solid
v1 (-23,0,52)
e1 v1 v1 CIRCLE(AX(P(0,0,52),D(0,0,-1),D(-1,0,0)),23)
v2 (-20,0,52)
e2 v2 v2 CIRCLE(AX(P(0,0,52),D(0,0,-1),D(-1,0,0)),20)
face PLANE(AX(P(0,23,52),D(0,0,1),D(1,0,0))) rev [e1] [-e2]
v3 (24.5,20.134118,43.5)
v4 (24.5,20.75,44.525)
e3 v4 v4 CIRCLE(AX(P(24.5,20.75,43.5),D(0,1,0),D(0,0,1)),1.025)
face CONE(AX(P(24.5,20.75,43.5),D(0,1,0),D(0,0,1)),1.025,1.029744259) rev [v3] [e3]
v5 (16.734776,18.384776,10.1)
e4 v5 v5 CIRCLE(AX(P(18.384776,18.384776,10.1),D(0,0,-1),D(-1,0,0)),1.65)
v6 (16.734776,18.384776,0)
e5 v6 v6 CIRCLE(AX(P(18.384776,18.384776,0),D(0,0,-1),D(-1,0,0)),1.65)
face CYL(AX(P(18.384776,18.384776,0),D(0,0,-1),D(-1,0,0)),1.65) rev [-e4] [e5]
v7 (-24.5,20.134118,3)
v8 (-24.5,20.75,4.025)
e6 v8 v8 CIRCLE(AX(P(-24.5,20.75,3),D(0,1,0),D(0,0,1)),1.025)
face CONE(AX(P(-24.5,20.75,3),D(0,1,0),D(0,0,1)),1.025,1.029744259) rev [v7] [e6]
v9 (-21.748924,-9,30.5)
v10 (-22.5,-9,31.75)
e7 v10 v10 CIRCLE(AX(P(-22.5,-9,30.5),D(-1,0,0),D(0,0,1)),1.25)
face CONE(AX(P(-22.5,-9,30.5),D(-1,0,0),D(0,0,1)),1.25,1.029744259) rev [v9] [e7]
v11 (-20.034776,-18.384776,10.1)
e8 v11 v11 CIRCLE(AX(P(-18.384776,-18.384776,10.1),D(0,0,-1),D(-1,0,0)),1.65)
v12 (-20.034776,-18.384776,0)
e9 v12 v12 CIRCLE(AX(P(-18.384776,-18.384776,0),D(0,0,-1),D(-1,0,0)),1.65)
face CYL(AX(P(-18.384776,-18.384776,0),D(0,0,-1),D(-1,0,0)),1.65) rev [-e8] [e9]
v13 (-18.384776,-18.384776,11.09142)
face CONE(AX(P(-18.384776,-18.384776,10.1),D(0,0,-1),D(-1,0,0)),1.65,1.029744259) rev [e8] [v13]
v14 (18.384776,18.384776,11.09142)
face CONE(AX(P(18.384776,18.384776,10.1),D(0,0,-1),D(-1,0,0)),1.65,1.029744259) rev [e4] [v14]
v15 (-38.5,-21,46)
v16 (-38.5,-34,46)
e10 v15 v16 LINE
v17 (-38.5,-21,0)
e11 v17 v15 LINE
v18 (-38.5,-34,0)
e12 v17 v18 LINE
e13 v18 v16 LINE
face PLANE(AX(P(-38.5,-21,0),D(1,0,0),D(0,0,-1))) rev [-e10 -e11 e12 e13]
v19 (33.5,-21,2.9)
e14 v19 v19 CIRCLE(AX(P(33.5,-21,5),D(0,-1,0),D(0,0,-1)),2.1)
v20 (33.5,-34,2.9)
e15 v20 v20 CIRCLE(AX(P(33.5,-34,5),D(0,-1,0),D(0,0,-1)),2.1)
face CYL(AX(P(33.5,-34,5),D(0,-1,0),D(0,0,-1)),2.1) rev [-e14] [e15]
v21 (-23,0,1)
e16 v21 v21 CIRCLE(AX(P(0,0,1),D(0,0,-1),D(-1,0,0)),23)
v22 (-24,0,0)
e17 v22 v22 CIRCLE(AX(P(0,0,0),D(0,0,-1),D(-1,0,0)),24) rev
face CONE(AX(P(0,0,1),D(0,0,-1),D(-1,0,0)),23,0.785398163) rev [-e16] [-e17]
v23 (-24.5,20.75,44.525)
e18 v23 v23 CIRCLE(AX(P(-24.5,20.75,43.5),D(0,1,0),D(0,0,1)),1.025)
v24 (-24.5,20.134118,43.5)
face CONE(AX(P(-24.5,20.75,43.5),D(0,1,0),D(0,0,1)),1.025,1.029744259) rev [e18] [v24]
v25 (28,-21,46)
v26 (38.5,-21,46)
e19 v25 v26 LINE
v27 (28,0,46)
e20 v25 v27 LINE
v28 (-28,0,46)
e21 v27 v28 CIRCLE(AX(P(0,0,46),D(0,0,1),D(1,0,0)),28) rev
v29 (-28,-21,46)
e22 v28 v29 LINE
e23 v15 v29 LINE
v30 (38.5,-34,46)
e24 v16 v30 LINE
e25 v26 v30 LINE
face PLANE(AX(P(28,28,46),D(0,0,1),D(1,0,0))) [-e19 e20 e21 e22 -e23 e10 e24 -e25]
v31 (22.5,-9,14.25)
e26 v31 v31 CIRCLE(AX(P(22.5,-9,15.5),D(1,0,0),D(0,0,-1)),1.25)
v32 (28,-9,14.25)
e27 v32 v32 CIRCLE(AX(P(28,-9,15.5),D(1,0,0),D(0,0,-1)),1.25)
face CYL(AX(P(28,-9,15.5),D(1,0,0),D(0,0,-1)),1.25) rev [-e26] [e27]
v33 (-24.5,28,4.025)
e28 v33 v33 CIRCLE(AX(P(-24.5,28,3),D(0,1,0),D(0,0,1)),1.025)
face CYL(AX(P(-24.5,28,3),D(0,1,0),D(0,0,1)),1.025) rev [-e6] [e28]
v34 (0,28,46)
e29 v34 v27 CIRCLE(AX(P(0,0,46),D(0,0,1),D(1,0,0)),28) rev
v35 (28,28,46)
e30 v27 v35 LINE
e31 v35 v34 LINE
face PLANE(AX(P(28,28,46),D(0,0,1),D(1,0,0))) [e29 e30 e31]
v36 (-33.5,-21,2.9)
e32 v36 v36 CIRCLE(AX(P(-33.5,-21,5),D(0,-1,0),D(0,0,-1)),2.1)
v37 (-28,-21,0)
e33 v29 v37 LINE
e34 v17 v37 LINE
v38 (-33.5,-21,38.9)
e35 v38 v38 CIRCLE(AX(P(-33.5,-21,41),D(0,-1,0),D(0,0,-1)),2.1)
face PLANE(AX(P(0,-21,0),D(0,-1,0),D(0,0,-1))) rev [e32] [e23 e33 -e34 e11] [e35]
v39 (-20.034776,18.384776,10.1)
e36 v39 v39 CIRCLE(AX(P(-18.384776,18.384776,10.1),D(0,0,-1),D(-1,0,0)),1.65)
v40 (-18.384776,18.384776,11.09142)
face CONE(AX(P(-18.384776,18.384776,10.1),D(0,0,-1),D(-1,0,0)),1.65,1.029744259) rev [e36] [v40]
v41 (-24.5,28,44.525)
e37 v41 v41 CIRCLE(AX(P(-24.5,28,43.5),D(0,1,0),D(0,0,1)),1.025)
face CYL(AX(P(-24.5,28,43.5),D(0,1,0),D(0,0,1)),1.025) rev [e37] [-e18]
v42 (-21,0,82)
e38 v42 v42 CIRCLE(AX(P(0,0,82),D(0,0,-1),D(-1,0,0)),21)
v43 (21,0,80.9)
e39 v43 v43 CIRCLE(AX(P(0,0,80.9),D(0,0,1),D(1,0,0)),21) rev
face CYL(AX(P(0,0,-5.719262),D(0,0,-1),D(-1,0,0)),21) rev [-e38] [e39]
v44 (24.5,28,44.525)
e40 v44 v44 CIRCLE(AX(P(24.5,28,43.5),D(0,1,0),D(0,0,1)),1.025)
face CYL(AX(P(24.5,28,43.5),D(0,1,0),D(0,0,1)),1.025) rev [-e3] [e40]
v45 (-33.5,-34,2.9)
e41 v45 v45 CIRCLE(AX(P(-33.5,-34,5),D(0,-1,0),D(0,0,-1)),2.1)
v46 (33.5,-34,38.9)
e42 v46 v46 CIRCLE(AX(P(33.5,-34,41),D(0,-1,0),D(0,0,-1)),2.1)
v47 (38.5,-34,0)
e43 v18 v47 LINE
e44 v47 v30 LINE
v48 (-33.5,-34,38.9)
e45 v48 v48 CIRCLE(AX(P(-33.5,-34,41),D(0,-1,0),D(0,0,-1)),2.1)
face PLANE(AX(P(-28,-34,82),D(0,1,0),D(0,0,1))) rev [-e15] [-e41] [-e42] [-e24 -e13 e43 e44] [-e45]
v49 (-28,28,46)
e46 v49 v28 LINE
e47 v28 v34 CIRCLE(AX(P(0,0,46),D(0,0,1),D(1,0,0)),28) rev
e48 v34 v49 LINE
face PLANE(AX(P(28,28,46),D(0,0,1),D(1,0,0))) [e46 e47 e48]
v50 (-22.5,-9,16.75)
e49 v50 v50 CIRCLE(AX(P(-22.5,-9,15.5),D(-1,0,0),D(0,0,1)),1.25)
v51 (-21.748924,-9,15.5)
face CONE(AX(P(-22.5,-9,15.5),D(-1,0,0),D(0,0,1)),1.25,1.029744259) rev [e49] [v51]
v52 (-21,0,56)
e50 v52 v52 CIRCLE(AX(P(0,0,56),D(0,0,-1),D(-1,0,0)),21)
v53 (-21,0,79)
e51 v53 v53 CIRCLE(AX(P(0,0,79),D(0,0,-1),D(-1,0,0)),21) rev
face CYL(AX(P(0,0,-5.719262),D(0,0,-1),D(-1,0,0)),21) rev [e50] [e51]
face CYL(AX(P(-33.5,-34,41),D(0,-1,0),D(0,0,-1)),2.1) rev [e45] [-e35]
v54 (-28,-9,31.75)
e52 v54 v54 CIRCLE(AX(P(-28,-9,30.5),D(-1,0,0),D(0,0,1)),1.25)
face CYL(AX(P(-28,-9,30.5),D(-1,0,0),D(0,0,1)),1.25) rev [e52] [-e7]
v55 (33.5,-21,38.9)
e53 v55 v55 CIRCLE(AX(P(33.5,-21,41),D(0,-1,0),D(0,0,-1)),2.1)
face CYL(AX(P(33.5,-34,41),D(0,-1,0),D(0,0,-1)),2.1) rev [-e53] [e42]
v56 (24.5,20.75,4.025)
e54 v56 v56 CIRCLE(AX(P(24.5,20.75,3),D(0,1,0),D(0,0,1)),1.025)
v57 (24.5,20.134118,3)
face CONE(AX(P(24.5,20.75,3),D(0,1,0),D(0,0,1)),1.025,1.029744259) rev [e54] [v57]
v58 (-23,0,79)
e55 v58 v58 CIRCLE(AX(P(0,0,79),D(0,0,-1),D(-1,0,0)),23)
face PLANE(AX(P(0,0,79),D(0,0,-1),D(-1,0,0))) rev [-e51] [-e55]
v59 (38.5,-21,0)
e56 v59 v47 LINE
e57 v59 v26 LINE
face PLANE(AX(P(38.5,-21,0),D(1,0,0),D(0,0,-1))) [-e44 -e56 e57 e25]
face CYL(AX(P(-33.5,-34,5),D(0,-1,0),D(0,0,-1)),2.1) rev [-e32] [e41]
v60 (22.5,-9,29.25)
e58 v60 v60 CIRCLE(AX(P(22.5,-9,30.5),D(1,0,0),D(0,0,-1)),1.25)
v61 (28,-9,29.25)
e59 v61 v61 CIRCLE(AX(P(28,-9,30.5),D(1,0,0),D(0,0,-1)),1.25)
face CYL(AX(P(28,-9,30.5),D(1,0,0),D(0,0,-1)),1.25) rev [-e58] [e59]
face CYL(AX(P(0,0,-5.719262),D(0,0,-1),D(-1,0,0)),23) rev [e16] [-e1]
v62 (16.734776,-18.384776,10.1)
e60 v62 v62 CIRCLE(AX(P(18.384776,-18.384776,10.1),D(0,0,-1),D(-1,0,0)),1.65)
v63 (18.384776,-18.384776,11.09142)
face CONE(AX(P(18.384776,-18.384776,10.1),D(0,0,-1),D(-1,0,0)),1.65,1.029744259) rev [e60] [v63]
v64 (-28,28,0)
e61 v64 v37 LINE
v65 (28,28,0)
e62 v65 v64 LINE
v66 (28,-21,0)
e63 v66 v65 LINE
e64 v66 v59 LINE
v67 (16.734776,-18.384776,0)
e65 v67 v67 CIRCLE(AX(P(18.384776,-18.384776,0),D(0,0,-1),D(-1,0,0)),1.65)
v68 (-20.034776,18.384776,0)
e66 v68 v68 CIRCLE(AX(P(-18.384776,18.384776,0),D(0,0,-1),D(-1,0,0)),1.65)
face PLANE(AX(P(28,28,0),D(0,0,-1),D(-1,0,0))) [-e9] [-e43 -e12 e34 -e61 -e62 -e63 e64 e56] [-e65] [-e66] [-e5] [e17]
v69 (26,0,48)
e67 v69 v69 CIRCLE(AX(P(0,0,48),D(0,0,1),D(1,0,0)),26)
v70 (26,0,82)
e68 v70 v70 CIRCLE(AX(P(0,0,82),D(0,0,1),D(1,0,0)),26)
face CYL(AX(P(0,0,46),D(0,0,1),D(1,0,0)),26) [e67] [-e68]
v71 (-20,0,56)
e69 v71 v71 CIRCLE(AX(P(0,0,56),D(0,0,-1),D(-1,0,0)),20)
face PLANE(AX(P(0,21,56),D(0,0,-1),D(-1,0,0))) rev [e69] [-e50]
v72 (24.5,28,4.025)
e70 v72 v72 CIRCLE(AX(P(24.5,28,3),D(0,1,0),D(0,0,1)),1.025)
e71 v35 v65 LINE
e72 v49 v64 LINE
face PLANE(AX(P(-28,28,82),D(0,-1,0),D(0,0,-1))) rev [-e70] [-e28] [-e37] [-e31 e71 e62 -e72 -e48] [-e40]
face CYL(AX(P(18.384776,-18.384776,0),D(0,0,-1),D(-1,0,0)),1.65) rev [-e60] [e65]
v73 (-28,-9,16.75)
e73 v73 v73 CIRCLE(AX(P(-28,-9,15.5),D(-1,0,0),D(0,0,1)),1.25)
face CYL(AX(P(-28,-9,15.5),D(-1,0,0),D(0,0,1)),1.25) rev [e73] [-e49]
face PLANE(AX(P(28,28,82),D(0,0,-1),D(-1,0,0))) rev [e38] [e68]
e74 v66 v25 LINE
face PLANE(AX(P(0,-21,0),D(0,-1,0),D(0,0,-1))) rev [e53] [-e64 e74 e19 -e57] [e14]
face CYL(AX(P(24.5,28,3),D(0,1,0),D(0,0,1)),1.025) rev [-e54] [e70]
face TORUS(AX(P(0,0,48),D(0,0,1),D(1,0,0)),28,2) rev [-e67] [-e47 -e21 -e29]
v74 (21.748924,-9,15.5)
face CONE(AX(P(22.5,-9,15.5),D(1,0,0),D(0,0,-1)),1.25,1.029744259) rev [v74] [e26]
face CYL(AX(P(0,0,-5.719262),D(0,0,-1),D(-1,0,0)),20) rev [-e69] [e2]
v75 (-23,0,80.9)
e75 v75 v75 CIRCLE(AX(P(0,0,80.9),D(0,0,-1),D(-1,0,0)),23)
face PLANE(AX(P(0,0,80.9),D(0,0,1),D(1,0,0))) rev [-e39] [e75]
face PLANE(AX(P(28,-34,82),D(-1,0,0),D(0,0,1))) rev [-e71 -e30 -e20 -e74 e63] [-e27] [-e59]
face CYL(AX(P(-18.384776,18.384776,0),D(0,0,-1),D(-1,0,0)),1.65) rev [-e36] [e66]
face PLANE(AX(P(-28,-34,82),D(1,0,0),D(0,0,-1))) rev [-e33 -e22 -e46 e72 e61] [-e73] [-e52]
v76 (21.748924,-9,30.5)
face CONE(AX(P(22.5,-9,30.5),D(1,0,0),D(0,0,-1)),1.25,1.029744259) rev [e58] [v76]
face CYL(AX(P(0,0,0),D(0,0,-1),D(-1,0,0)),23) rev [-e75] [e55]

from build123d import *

# Parameters (mm, degrees)
SKETCH_1_W                  = 56
SKETCH_1_H                  = 62
EXTRUDE_1_DEPTH             = 82
SKETCH_4_W                  = 56
SKETCH_4_H                  = 62
SKETCH_4_R                  = 26
CUT_EXTRUDE_1_DEPTH         = 36
HOLE_WIZARD_M4_1_D          = 3.3
HOLE_WIZARD_M4_1_DEPTH      = 10.1
HOLE_WIZARD_M4_1_TIP        = 0.991420021
SKETCH_15_W                 = 23
SKETCH_15_H                 = 1.9
FILLET_1_R                  = 2
CHAMFER_2_SIZE              = 1
HOLE_WIZARD_M2_5_1_D        = 2.05
HOLE_WIZARD_M2_5_1_DEPTH    = 7.25
HOLE_WIZARD_M2_5_1_TIP      = 0.615882135
SKETCH_19_W                 = 10.5
SKETCH_19_H                 = 46
EXTRUDE_2_DEPTH             = 13
HOLE_WIZARD_M5_1_D          = 4.2
HOLE_WIZARD_M3_1_AT_2_COUNT = 2
HOLE_WIZARD_M3_1_AT_2_PITCH = 15


with BuildPart() as part:
    # 草图1 → 凸台-拉伸1 (new body)
    with BuildSketch(Plane.XY):
        with Locations((0, -3)):
            Rectangle(SKETCH_1_W, SKETCH_1_H)
    extrude(amount=EXTRUDE_1_DEPTH)

    # 草图3 → 切除-旋转2 (revolve, cut)
    with BuildSketch(Plane(origin=(0, 0, 0), x_dir=(0, 0, -1), z_dir=(1, 0, 0)), mode=Mode.PRIVATE) as cut_revolve_2_sk:
        Polygon((-82, 0), (0, 0), (0, 23), (-52, 23), (-52, 20), (-56, 20), (-56, 21), (-82, 21), align=None)
    revolve(cut_revolve_2_sk.sketch.rotate(Axis((0, 0, -5.719261836), (0, 0, 1)), 90), axis=Axis((0, 0, -5.719261836), (0, 0, 1)), mode=Mode.SUBTRACT)

    # 草图4 → 切除-拉伸1 (cut)
    with BuildSketch(Plane.XY.offset(82)):
        with Locations((0, -3)):
            Rectangle(SKETCH_4_W, SKETCH_4_H)
        Circle(SKETCH_4_R, mode=Mode.SUBTRACT)
    extrude(amount=-CUT_EXTRUDE_1_DEPTH, mode=Mode.SUBTRACT)

    # M4 螺纹孔1
    with Locations(Plane(origin=(0, 0, 0), x_dir=(-1, 0, 0), z_dir=(0, 0, -1))):
        with Locations((18.384776311, 18.384776311), (18.384776311, -18.384776311), (-18.384776311, -18.384776311), (-18.384776311, 18.384776311)):
            Hole(HOLE_WIZARD_M4_1_D / 2, depth=HOLE_WIZARD_M4_1_DEPTH)
            with Locations((0, 0, -(HOLE_WIZARD_M4_1_DEPTH + HOLE_WIZARD_M4_1_TIP / 2))):  # 118° drill point
                Cone(0, HOLE_WIZARD_M4_1_D / 2, HOLE_WIZARD_M4_1_TIP, mode=Mode.SUBTRACT)

    # 草图15 → 切除-旋转3 (revolve, cut)
    with BuildSketch(Plane(origin=(0, 0, 0), x_dir=(1, 0, 0), z_dir=(0, 1, 0))):
        with Locations((-11.5, -79.95)):
            Rectangle(SKETCH_15_W, SKETCH_15_H)
    revolve(axis=Axis((0, 0, 0), (0, 0, 1)), mode=Mode.SUBTRACT)

    # 圆角1
    fillet_1_edges = [part.edges().sort_by_distance(p)[0] for p in [
        (-26, 0, 46),
    ]]
    fillet(fillet_1_edges, radius=FILLET_1_R - 0.0001)  # a hair under: the kernel refuses the full size

    # 倒角2
    chamfer_2_edges = [part.edges().sort_by_distance(p)[0] for p in [
        (23, 0, 0),
    ]]
    chamfer(chamfer_2_edges, length=CHAMFER_2_SIZE)

    # M2.5 螺纹孔1
    with Locations(Plane(origin=(0, 28, 0), x_dir=(1, 0, 0), z_dir=(0, 1, 0))):
        with Locations((24.5, -3), (-24.5, -43.5), (-24.5, -3), (24.5, -43.5)):
            Hole(HOLE_WIZARD_M2_5_1_D / 2, depth=HOLE_WIZARD_M2_5_1_DEPTH)
            with Locations((0, 0, -(HOLE_WIZARD_M2_5_1_DEPTH + HOLE_WIZARD_M2_5_1_TIP / 2))):  # 118° drill point
                Cone(0, HOLE_WIZARD_M2_5_1_D / 2, HOLE_WIZARD_M2_5_1_TIP, mode=Mode.SUBTRACT)

    # 草图19 → 凸台-拉伸2 (add)
    with BuildSketch(Plane.XZ.offset(34)):
        with Locations((33.25, 23)):
            Rectangle(SKETCH_19_W, SKETCH_19_H)
        with Locations((-33.25, 23)):
            Rectangle(SKETCH_19_W, SKETCH_19_H)
    extrude(amount=-EXTRUDE_2_DEPTH)

    # M5 螺纹孔1 (through all)
    with Locations(Plane(origin=(0, -34, 0), x_dir=(-1, 0, 0), z_dir=(0, -1, 0))):
        with Locations((33.5, -5), (-33.5, -41), (-33.5, -5), (33.5, -41)):
            Hole(HOLE_WIZARD_M5_1_D / 2)

    # 草图24 → M3 螺纹孔1 (revolve, cut)
    with BuildSketch(Plane(origin=(28, -9, 30.5), x_dir=(0, 0, -1), z_dir=(0, 1, 0))):
        Polygon((0, 0), (0, 6.251075774), (1.25, 5.5), (1.25, 0), align=None)
    hole_wizard_m3_1 = revolve(axis=Axis((34.35, -9, 30.5), (-1, 0, 0)), mode=Mode.SUBTRACT)

    # M3 螺纹孔1 at 2: M3 螺纹孔1 ×2
    with Locations(*[(0, 0, -i * HOLE_WIZARD_M3_1_AT_2_PITCH) for i in range(1, HOLE_WIZARD_M3_1_AT_2_COUNT)]):
        add(hole_wizard_m3_1, mode=Mode.SUBTRACT)

    # 镜向1: M3 螺纹孔1 across plane
    add(hole_wizard_m3_1.mirror(Plane(origin=(0, 0, 0), x_dir=(0, 0, 1), z_dir=(1, 0, 0))), mode=Mode.SUBTRACT)

    # 镜向1 copy 1 sketch → 镜向1 copy 1 (revolve, cut)
    with BuildSketch(Plane(origin=(-28, -9, 15.5), x_dir=(0, 0, -1), z_dir=(0, 1, 0))):
        Polygon((0, 0), (0, -6.251075774), (1.25, -5.5), (1.25, 0), align=None)
    revolve(axis=Axis((-34.35, -9, 15.5), (-1, 0, 0)), mode=Mode.SUBTRACT)


solid = part.part
